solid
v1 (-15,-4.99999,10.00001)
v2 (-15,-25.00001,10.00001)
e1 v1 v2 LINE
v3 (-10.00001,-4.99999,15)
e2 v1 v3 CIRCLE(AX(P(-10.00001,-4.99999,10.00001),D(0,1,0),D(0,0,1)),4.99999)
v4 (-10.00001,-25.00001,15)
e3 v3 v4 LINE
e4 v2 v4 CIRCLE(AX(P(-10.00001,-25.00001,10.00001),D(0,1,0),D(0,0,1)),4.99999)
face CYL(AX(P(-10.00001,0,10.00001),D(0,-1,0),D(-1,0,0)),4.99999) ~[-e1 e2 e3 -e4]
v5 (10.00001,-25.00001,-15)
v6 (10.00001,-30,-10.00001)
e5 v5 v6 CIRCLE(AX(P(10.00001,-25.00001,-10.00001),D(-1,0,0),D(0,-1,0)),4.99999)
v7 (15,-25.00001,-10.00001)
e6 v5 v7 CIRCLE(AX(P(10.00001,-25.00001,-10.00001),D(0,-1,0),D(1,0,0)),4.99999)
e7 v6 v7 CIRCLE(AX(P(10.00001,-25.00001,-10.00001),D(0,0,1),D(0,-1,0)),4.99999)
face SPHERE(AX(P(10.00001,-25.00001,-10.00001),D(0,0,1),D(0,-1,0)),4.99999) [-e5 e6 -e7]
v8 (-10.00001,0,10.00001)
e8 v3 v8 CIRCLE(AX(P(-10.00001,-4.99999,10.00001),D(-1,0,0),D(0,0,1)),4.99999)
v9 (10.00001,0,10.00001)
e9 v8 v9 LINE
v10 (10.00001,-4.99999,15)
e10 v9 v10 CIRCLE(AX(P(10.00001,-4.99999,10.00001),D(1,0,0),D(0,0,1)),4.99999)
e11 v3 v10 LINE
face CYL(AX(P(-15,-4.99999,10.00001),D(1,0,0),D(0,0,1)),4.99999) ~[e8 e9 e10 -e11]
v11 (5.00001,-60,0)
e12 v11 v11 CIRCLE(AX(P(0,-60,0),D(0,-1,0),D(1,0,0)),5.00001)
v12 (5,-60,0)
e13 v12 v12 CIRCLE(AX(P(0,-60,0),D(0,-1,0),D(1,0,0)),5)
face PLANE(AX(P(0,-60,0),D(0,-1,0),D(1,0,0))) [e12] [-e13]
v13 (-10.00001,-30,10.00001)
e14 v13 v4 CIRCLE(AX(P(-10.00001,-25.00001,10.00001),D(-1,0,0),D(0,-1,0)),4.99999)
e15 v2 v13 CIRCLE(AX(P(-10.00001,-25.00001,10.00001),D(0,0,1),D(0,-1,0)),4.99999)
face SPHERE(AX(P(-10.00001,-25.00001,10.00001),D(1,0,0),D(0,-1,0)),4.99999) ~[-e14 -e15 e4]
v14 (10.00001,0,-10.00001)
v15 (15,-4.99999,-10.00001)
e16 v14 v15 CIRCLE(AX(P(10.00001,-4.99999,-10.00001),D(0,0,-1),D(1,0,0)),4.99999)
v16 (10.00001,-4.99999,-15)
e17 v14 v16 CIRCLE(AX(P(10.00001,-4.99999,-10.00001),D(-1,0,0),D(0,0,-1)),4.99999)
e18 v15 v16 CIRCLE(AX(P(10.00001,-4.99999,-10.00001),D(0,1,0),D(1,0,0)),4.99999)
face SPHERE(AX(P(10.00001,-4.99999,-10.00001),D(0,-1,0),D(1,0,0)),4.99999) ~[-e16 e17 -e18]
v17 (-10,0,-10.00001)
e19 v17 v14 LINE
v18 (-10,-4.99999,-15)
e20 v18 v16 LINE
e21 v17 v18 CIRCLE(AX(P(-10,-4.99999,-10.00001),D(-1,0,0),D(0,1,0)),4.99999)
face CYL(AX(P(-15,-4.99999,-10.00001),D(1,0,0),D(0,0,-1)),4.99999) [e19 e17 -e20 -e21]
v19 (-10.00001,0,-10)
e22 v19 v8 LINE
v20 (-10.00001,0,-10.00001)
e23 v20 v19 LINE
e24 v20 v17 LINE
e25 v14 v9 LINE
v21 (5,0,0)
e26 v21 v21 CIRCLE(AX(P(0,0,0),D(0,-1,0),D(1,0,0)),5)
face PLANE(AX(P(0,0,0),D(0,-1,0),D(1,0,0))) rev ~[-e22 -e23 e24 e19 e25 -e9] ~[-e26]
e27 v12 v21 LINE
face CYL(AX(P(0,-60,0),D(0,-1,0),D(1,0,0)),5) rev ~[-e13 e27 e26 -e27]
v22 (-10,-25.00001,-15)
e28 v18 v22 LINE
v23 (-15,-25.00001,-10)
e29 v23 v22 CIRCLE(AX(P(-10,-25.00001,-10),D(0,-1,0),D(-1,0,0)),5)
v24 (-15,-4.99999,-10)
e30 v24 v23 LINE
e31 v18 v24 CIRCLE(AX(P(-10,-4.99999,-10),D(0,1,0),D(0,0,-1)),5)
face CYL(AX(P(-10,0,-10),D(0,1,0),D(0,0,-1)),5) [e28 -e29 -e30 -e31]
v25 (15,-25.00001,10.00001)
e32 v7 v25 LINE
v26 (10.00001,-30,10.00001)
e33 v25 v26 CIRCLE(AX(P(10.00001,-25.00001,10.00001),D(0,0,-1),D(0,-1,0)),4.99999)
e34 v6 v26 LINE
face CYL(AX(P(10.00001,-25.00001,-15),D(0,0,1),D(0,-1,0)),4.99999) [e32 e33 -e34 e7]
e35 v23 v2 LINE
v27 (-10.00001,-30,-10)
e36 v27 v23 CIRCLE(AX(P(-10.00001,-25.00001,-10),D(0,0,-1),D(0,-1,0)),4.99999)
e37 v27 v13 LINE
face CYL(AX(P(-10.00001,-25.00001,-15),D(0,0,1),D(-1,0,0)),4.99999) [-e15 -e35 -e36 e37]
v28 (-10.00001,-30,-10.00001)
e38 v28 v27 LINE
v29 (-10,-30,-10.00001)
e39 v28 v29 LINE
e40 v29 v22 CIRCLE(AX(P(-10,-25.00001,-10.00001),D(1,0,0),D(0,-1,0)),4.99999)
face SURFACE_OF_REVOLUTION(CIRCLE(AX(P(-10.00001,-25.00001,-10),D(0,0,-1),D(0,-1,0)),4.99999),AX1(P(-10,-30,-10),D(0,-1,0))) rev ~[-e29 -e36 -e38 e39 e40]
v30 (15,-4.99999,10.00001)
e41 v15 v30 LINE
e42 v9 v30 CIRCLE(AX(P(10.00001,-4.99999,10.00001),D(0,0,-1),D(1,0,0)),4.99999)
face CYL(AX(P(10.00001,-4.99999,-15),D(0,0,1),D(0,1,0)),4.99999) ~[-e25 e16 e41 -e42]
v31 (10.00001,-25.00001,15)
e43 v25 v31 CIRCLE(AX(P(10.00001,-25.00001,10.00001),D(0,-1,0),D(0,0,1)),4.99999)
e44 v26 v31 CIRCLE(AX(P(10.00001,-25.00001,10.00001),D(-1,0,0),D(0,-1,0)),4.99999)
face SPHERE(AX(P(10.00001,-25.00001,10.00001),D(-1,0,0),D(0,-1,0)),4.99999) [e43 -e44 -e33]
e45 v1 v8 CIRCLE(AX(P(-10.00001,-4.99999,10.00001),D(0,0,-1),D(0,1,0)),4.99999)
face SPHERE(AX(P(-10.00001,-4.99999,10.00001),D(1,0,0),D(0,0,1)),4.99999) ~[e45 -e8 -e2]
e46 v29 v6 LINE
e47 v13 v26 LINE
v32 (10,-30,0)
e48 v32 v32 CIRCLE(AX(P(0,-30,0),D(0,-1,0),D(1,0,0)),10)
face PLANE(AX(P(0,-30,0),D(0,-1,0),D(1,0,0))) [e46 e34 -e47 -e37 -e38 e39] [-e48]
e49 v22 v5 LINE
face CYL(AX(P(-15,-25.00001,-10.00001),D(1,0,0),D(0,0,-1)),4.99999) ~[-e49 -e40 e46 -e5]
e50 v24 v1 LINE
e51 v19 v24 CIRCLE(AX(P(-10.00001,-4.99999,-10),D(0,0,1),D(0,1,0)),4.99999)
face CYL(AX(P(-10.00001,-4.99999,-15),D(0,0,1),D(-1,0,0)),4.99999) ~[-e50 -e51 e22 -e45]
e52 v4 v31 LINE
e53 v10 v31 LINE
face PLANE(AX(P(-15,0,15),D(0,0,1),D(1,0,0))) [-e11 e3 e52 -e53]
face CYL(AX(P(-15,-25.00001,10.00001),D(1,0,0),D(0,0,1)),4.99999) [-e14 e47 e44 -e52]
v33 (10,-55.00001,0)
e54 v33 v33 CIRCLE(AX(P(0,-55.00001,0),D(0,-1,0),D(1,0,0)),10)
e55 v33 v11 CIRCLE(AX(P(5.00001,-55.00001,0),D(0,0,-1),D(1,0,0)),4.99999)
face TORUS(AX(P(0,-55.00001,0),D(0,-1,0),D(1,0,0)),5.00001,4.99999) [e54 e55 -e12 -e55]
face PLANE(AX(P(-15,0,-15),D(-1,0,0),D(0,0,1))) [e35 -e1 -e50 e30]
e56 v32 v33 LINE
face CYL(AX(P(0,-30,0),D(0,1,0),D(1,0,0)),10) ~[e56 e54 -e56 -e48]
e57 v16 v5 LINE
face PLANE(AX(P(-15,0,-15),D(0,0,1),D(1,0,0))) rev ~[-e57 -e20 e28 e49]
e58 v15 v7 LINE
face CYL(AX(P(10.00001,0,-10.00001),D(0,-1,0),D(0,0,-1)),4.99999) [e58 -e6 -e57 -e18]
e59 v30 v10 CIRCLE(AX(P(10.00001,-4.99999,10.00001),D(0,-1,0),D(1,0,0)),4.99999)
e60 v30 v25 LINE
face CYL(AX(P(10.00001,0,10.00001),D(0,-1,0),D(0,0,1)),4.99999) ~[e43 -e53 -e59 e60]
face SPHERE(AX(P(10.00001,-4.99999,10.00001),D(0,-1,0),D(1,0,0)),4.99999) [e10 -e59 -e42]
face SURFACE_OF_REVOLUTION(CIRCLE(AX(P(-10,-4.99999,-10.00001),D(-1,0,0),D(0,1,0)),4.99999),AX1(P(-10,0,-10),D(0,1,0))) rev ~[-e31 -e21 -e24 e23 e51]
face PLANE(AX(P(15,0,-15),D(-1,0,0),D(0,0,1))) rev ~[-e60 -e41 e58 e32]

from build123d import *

# Parameters (mm, degrees)
F0_W        = 30
F0_H        = 30
F1_DEPTH    = 30
F2_R        = 10
F3_DEPTH    = 30
F4_R        = 5
F5_DEPTH    = 60.001
F6_R        = 4.99999
F7_T1_DEPTH = 30
F7_T4_ANGLE = 90
F7_T6_ANGLE = 90


# Not quite as in the source:
# - a fillet or chamfer that OpenCascade refuses, or shapes differently, is made with other operations: its cross-section is extruded or revolved along the edge and cut away or added
# - a fillet or chamfer is up to 0.001 mm smaller than in the source, because OpenCascade refuses the exact size


with BuildPart() as f1:
    # F0 (on Front) → F1 (new body)
    with BuildSketch(Plane.XZ):
        Rectangle(F0_W, F0_H)
    extrude(amount=F1_DEPTH)

    # F2 (on face) → F3 (join)
    with BuildSketch(Plane.XZ.offset(30)):
        Circle(F2_R)
    extrude(amount=F3_DEPTH)

    # F4 (on face) → F5 (cut, through all)
    with BuildSketch(Plane.XZ.offset(60)):
        Circle(F4_R)
    extrude(amount=-F5_DEPTH, mode=Mode.SUBTRACT)

    # F6 (radius 5 in the source; OpenCascade refuses exactly that, so slightly less here)
    f6_edges = [f1.edges().sort_by_distance(p)[0] for p in [
        (0, -30, 15),
        (-15, -30, 0),
        (15, -30, 0),
        (0, -30, -15),
        (15, -15, 15),
        (15, -15, -15),
        (15, 0, 0),
        (0, 0, 15),
        (-15, -15, 15),
        (0, 0, -15),
        (-15, 0, 0),
        (-10, -60, 0),
    ]]
    fillet(f6_edges, radius=F6_R)

    # F7: fillet of radius 5 on 2 edges, made by hand

    # F7_s2 → F7_t1 (cut)
    with BuildSketch(Plane.XZ):
        with BuildLine():
            ThreePointArc((-10, -15), (-13.5355339059, -13.5355339059), (-15, -10))
            Line((-15, -10), (-15, -15))
            Line((-15, -15), (-10, -15))
        make_face()
    extrude(amount=F7_T1_DEPTH, mode=Mode.SUBTRACT)

    # F7_s3 → F7_t4 (revolve, cut)
    with BuildSketch(Plane.YZ.offset(-10)):
        with BuildLine():
            ThreePointArc((0, -10.00001), (-1.4644631651, -13.5355368349), (-4.99999, -15))
            Line((-4.99999, -15), (0, -15))
            Line((0, -15), (0, -10.00001))
        make_face()
    revolve(axis=Axis((-10, 0, -10), (0, 1, 0)), revolution_arc=F7_T4_ANGLE, mode=Mode.SUBTRACT)

    # F7_s5 → F7_t6 (revolve, cut)
    with BuildSketch(Plane.XY.offset(-10)):
        with BuildLine():
            ThreePointArc((-10.00001, -30), (-13.5355368349, -28.5355368349), (-15, -25.00001))
            Line((-15, -25.00001), (-15, -30))
            Line((-15, -30), (-10.00001, -30))
        make_face()
    revolve(axis=Axis((-10, -30, -10), (0, -1, 0)), revolution_arc=F7_T6_ANGLE, mode=Mode.SUBTRACT)


solid = f1.part
